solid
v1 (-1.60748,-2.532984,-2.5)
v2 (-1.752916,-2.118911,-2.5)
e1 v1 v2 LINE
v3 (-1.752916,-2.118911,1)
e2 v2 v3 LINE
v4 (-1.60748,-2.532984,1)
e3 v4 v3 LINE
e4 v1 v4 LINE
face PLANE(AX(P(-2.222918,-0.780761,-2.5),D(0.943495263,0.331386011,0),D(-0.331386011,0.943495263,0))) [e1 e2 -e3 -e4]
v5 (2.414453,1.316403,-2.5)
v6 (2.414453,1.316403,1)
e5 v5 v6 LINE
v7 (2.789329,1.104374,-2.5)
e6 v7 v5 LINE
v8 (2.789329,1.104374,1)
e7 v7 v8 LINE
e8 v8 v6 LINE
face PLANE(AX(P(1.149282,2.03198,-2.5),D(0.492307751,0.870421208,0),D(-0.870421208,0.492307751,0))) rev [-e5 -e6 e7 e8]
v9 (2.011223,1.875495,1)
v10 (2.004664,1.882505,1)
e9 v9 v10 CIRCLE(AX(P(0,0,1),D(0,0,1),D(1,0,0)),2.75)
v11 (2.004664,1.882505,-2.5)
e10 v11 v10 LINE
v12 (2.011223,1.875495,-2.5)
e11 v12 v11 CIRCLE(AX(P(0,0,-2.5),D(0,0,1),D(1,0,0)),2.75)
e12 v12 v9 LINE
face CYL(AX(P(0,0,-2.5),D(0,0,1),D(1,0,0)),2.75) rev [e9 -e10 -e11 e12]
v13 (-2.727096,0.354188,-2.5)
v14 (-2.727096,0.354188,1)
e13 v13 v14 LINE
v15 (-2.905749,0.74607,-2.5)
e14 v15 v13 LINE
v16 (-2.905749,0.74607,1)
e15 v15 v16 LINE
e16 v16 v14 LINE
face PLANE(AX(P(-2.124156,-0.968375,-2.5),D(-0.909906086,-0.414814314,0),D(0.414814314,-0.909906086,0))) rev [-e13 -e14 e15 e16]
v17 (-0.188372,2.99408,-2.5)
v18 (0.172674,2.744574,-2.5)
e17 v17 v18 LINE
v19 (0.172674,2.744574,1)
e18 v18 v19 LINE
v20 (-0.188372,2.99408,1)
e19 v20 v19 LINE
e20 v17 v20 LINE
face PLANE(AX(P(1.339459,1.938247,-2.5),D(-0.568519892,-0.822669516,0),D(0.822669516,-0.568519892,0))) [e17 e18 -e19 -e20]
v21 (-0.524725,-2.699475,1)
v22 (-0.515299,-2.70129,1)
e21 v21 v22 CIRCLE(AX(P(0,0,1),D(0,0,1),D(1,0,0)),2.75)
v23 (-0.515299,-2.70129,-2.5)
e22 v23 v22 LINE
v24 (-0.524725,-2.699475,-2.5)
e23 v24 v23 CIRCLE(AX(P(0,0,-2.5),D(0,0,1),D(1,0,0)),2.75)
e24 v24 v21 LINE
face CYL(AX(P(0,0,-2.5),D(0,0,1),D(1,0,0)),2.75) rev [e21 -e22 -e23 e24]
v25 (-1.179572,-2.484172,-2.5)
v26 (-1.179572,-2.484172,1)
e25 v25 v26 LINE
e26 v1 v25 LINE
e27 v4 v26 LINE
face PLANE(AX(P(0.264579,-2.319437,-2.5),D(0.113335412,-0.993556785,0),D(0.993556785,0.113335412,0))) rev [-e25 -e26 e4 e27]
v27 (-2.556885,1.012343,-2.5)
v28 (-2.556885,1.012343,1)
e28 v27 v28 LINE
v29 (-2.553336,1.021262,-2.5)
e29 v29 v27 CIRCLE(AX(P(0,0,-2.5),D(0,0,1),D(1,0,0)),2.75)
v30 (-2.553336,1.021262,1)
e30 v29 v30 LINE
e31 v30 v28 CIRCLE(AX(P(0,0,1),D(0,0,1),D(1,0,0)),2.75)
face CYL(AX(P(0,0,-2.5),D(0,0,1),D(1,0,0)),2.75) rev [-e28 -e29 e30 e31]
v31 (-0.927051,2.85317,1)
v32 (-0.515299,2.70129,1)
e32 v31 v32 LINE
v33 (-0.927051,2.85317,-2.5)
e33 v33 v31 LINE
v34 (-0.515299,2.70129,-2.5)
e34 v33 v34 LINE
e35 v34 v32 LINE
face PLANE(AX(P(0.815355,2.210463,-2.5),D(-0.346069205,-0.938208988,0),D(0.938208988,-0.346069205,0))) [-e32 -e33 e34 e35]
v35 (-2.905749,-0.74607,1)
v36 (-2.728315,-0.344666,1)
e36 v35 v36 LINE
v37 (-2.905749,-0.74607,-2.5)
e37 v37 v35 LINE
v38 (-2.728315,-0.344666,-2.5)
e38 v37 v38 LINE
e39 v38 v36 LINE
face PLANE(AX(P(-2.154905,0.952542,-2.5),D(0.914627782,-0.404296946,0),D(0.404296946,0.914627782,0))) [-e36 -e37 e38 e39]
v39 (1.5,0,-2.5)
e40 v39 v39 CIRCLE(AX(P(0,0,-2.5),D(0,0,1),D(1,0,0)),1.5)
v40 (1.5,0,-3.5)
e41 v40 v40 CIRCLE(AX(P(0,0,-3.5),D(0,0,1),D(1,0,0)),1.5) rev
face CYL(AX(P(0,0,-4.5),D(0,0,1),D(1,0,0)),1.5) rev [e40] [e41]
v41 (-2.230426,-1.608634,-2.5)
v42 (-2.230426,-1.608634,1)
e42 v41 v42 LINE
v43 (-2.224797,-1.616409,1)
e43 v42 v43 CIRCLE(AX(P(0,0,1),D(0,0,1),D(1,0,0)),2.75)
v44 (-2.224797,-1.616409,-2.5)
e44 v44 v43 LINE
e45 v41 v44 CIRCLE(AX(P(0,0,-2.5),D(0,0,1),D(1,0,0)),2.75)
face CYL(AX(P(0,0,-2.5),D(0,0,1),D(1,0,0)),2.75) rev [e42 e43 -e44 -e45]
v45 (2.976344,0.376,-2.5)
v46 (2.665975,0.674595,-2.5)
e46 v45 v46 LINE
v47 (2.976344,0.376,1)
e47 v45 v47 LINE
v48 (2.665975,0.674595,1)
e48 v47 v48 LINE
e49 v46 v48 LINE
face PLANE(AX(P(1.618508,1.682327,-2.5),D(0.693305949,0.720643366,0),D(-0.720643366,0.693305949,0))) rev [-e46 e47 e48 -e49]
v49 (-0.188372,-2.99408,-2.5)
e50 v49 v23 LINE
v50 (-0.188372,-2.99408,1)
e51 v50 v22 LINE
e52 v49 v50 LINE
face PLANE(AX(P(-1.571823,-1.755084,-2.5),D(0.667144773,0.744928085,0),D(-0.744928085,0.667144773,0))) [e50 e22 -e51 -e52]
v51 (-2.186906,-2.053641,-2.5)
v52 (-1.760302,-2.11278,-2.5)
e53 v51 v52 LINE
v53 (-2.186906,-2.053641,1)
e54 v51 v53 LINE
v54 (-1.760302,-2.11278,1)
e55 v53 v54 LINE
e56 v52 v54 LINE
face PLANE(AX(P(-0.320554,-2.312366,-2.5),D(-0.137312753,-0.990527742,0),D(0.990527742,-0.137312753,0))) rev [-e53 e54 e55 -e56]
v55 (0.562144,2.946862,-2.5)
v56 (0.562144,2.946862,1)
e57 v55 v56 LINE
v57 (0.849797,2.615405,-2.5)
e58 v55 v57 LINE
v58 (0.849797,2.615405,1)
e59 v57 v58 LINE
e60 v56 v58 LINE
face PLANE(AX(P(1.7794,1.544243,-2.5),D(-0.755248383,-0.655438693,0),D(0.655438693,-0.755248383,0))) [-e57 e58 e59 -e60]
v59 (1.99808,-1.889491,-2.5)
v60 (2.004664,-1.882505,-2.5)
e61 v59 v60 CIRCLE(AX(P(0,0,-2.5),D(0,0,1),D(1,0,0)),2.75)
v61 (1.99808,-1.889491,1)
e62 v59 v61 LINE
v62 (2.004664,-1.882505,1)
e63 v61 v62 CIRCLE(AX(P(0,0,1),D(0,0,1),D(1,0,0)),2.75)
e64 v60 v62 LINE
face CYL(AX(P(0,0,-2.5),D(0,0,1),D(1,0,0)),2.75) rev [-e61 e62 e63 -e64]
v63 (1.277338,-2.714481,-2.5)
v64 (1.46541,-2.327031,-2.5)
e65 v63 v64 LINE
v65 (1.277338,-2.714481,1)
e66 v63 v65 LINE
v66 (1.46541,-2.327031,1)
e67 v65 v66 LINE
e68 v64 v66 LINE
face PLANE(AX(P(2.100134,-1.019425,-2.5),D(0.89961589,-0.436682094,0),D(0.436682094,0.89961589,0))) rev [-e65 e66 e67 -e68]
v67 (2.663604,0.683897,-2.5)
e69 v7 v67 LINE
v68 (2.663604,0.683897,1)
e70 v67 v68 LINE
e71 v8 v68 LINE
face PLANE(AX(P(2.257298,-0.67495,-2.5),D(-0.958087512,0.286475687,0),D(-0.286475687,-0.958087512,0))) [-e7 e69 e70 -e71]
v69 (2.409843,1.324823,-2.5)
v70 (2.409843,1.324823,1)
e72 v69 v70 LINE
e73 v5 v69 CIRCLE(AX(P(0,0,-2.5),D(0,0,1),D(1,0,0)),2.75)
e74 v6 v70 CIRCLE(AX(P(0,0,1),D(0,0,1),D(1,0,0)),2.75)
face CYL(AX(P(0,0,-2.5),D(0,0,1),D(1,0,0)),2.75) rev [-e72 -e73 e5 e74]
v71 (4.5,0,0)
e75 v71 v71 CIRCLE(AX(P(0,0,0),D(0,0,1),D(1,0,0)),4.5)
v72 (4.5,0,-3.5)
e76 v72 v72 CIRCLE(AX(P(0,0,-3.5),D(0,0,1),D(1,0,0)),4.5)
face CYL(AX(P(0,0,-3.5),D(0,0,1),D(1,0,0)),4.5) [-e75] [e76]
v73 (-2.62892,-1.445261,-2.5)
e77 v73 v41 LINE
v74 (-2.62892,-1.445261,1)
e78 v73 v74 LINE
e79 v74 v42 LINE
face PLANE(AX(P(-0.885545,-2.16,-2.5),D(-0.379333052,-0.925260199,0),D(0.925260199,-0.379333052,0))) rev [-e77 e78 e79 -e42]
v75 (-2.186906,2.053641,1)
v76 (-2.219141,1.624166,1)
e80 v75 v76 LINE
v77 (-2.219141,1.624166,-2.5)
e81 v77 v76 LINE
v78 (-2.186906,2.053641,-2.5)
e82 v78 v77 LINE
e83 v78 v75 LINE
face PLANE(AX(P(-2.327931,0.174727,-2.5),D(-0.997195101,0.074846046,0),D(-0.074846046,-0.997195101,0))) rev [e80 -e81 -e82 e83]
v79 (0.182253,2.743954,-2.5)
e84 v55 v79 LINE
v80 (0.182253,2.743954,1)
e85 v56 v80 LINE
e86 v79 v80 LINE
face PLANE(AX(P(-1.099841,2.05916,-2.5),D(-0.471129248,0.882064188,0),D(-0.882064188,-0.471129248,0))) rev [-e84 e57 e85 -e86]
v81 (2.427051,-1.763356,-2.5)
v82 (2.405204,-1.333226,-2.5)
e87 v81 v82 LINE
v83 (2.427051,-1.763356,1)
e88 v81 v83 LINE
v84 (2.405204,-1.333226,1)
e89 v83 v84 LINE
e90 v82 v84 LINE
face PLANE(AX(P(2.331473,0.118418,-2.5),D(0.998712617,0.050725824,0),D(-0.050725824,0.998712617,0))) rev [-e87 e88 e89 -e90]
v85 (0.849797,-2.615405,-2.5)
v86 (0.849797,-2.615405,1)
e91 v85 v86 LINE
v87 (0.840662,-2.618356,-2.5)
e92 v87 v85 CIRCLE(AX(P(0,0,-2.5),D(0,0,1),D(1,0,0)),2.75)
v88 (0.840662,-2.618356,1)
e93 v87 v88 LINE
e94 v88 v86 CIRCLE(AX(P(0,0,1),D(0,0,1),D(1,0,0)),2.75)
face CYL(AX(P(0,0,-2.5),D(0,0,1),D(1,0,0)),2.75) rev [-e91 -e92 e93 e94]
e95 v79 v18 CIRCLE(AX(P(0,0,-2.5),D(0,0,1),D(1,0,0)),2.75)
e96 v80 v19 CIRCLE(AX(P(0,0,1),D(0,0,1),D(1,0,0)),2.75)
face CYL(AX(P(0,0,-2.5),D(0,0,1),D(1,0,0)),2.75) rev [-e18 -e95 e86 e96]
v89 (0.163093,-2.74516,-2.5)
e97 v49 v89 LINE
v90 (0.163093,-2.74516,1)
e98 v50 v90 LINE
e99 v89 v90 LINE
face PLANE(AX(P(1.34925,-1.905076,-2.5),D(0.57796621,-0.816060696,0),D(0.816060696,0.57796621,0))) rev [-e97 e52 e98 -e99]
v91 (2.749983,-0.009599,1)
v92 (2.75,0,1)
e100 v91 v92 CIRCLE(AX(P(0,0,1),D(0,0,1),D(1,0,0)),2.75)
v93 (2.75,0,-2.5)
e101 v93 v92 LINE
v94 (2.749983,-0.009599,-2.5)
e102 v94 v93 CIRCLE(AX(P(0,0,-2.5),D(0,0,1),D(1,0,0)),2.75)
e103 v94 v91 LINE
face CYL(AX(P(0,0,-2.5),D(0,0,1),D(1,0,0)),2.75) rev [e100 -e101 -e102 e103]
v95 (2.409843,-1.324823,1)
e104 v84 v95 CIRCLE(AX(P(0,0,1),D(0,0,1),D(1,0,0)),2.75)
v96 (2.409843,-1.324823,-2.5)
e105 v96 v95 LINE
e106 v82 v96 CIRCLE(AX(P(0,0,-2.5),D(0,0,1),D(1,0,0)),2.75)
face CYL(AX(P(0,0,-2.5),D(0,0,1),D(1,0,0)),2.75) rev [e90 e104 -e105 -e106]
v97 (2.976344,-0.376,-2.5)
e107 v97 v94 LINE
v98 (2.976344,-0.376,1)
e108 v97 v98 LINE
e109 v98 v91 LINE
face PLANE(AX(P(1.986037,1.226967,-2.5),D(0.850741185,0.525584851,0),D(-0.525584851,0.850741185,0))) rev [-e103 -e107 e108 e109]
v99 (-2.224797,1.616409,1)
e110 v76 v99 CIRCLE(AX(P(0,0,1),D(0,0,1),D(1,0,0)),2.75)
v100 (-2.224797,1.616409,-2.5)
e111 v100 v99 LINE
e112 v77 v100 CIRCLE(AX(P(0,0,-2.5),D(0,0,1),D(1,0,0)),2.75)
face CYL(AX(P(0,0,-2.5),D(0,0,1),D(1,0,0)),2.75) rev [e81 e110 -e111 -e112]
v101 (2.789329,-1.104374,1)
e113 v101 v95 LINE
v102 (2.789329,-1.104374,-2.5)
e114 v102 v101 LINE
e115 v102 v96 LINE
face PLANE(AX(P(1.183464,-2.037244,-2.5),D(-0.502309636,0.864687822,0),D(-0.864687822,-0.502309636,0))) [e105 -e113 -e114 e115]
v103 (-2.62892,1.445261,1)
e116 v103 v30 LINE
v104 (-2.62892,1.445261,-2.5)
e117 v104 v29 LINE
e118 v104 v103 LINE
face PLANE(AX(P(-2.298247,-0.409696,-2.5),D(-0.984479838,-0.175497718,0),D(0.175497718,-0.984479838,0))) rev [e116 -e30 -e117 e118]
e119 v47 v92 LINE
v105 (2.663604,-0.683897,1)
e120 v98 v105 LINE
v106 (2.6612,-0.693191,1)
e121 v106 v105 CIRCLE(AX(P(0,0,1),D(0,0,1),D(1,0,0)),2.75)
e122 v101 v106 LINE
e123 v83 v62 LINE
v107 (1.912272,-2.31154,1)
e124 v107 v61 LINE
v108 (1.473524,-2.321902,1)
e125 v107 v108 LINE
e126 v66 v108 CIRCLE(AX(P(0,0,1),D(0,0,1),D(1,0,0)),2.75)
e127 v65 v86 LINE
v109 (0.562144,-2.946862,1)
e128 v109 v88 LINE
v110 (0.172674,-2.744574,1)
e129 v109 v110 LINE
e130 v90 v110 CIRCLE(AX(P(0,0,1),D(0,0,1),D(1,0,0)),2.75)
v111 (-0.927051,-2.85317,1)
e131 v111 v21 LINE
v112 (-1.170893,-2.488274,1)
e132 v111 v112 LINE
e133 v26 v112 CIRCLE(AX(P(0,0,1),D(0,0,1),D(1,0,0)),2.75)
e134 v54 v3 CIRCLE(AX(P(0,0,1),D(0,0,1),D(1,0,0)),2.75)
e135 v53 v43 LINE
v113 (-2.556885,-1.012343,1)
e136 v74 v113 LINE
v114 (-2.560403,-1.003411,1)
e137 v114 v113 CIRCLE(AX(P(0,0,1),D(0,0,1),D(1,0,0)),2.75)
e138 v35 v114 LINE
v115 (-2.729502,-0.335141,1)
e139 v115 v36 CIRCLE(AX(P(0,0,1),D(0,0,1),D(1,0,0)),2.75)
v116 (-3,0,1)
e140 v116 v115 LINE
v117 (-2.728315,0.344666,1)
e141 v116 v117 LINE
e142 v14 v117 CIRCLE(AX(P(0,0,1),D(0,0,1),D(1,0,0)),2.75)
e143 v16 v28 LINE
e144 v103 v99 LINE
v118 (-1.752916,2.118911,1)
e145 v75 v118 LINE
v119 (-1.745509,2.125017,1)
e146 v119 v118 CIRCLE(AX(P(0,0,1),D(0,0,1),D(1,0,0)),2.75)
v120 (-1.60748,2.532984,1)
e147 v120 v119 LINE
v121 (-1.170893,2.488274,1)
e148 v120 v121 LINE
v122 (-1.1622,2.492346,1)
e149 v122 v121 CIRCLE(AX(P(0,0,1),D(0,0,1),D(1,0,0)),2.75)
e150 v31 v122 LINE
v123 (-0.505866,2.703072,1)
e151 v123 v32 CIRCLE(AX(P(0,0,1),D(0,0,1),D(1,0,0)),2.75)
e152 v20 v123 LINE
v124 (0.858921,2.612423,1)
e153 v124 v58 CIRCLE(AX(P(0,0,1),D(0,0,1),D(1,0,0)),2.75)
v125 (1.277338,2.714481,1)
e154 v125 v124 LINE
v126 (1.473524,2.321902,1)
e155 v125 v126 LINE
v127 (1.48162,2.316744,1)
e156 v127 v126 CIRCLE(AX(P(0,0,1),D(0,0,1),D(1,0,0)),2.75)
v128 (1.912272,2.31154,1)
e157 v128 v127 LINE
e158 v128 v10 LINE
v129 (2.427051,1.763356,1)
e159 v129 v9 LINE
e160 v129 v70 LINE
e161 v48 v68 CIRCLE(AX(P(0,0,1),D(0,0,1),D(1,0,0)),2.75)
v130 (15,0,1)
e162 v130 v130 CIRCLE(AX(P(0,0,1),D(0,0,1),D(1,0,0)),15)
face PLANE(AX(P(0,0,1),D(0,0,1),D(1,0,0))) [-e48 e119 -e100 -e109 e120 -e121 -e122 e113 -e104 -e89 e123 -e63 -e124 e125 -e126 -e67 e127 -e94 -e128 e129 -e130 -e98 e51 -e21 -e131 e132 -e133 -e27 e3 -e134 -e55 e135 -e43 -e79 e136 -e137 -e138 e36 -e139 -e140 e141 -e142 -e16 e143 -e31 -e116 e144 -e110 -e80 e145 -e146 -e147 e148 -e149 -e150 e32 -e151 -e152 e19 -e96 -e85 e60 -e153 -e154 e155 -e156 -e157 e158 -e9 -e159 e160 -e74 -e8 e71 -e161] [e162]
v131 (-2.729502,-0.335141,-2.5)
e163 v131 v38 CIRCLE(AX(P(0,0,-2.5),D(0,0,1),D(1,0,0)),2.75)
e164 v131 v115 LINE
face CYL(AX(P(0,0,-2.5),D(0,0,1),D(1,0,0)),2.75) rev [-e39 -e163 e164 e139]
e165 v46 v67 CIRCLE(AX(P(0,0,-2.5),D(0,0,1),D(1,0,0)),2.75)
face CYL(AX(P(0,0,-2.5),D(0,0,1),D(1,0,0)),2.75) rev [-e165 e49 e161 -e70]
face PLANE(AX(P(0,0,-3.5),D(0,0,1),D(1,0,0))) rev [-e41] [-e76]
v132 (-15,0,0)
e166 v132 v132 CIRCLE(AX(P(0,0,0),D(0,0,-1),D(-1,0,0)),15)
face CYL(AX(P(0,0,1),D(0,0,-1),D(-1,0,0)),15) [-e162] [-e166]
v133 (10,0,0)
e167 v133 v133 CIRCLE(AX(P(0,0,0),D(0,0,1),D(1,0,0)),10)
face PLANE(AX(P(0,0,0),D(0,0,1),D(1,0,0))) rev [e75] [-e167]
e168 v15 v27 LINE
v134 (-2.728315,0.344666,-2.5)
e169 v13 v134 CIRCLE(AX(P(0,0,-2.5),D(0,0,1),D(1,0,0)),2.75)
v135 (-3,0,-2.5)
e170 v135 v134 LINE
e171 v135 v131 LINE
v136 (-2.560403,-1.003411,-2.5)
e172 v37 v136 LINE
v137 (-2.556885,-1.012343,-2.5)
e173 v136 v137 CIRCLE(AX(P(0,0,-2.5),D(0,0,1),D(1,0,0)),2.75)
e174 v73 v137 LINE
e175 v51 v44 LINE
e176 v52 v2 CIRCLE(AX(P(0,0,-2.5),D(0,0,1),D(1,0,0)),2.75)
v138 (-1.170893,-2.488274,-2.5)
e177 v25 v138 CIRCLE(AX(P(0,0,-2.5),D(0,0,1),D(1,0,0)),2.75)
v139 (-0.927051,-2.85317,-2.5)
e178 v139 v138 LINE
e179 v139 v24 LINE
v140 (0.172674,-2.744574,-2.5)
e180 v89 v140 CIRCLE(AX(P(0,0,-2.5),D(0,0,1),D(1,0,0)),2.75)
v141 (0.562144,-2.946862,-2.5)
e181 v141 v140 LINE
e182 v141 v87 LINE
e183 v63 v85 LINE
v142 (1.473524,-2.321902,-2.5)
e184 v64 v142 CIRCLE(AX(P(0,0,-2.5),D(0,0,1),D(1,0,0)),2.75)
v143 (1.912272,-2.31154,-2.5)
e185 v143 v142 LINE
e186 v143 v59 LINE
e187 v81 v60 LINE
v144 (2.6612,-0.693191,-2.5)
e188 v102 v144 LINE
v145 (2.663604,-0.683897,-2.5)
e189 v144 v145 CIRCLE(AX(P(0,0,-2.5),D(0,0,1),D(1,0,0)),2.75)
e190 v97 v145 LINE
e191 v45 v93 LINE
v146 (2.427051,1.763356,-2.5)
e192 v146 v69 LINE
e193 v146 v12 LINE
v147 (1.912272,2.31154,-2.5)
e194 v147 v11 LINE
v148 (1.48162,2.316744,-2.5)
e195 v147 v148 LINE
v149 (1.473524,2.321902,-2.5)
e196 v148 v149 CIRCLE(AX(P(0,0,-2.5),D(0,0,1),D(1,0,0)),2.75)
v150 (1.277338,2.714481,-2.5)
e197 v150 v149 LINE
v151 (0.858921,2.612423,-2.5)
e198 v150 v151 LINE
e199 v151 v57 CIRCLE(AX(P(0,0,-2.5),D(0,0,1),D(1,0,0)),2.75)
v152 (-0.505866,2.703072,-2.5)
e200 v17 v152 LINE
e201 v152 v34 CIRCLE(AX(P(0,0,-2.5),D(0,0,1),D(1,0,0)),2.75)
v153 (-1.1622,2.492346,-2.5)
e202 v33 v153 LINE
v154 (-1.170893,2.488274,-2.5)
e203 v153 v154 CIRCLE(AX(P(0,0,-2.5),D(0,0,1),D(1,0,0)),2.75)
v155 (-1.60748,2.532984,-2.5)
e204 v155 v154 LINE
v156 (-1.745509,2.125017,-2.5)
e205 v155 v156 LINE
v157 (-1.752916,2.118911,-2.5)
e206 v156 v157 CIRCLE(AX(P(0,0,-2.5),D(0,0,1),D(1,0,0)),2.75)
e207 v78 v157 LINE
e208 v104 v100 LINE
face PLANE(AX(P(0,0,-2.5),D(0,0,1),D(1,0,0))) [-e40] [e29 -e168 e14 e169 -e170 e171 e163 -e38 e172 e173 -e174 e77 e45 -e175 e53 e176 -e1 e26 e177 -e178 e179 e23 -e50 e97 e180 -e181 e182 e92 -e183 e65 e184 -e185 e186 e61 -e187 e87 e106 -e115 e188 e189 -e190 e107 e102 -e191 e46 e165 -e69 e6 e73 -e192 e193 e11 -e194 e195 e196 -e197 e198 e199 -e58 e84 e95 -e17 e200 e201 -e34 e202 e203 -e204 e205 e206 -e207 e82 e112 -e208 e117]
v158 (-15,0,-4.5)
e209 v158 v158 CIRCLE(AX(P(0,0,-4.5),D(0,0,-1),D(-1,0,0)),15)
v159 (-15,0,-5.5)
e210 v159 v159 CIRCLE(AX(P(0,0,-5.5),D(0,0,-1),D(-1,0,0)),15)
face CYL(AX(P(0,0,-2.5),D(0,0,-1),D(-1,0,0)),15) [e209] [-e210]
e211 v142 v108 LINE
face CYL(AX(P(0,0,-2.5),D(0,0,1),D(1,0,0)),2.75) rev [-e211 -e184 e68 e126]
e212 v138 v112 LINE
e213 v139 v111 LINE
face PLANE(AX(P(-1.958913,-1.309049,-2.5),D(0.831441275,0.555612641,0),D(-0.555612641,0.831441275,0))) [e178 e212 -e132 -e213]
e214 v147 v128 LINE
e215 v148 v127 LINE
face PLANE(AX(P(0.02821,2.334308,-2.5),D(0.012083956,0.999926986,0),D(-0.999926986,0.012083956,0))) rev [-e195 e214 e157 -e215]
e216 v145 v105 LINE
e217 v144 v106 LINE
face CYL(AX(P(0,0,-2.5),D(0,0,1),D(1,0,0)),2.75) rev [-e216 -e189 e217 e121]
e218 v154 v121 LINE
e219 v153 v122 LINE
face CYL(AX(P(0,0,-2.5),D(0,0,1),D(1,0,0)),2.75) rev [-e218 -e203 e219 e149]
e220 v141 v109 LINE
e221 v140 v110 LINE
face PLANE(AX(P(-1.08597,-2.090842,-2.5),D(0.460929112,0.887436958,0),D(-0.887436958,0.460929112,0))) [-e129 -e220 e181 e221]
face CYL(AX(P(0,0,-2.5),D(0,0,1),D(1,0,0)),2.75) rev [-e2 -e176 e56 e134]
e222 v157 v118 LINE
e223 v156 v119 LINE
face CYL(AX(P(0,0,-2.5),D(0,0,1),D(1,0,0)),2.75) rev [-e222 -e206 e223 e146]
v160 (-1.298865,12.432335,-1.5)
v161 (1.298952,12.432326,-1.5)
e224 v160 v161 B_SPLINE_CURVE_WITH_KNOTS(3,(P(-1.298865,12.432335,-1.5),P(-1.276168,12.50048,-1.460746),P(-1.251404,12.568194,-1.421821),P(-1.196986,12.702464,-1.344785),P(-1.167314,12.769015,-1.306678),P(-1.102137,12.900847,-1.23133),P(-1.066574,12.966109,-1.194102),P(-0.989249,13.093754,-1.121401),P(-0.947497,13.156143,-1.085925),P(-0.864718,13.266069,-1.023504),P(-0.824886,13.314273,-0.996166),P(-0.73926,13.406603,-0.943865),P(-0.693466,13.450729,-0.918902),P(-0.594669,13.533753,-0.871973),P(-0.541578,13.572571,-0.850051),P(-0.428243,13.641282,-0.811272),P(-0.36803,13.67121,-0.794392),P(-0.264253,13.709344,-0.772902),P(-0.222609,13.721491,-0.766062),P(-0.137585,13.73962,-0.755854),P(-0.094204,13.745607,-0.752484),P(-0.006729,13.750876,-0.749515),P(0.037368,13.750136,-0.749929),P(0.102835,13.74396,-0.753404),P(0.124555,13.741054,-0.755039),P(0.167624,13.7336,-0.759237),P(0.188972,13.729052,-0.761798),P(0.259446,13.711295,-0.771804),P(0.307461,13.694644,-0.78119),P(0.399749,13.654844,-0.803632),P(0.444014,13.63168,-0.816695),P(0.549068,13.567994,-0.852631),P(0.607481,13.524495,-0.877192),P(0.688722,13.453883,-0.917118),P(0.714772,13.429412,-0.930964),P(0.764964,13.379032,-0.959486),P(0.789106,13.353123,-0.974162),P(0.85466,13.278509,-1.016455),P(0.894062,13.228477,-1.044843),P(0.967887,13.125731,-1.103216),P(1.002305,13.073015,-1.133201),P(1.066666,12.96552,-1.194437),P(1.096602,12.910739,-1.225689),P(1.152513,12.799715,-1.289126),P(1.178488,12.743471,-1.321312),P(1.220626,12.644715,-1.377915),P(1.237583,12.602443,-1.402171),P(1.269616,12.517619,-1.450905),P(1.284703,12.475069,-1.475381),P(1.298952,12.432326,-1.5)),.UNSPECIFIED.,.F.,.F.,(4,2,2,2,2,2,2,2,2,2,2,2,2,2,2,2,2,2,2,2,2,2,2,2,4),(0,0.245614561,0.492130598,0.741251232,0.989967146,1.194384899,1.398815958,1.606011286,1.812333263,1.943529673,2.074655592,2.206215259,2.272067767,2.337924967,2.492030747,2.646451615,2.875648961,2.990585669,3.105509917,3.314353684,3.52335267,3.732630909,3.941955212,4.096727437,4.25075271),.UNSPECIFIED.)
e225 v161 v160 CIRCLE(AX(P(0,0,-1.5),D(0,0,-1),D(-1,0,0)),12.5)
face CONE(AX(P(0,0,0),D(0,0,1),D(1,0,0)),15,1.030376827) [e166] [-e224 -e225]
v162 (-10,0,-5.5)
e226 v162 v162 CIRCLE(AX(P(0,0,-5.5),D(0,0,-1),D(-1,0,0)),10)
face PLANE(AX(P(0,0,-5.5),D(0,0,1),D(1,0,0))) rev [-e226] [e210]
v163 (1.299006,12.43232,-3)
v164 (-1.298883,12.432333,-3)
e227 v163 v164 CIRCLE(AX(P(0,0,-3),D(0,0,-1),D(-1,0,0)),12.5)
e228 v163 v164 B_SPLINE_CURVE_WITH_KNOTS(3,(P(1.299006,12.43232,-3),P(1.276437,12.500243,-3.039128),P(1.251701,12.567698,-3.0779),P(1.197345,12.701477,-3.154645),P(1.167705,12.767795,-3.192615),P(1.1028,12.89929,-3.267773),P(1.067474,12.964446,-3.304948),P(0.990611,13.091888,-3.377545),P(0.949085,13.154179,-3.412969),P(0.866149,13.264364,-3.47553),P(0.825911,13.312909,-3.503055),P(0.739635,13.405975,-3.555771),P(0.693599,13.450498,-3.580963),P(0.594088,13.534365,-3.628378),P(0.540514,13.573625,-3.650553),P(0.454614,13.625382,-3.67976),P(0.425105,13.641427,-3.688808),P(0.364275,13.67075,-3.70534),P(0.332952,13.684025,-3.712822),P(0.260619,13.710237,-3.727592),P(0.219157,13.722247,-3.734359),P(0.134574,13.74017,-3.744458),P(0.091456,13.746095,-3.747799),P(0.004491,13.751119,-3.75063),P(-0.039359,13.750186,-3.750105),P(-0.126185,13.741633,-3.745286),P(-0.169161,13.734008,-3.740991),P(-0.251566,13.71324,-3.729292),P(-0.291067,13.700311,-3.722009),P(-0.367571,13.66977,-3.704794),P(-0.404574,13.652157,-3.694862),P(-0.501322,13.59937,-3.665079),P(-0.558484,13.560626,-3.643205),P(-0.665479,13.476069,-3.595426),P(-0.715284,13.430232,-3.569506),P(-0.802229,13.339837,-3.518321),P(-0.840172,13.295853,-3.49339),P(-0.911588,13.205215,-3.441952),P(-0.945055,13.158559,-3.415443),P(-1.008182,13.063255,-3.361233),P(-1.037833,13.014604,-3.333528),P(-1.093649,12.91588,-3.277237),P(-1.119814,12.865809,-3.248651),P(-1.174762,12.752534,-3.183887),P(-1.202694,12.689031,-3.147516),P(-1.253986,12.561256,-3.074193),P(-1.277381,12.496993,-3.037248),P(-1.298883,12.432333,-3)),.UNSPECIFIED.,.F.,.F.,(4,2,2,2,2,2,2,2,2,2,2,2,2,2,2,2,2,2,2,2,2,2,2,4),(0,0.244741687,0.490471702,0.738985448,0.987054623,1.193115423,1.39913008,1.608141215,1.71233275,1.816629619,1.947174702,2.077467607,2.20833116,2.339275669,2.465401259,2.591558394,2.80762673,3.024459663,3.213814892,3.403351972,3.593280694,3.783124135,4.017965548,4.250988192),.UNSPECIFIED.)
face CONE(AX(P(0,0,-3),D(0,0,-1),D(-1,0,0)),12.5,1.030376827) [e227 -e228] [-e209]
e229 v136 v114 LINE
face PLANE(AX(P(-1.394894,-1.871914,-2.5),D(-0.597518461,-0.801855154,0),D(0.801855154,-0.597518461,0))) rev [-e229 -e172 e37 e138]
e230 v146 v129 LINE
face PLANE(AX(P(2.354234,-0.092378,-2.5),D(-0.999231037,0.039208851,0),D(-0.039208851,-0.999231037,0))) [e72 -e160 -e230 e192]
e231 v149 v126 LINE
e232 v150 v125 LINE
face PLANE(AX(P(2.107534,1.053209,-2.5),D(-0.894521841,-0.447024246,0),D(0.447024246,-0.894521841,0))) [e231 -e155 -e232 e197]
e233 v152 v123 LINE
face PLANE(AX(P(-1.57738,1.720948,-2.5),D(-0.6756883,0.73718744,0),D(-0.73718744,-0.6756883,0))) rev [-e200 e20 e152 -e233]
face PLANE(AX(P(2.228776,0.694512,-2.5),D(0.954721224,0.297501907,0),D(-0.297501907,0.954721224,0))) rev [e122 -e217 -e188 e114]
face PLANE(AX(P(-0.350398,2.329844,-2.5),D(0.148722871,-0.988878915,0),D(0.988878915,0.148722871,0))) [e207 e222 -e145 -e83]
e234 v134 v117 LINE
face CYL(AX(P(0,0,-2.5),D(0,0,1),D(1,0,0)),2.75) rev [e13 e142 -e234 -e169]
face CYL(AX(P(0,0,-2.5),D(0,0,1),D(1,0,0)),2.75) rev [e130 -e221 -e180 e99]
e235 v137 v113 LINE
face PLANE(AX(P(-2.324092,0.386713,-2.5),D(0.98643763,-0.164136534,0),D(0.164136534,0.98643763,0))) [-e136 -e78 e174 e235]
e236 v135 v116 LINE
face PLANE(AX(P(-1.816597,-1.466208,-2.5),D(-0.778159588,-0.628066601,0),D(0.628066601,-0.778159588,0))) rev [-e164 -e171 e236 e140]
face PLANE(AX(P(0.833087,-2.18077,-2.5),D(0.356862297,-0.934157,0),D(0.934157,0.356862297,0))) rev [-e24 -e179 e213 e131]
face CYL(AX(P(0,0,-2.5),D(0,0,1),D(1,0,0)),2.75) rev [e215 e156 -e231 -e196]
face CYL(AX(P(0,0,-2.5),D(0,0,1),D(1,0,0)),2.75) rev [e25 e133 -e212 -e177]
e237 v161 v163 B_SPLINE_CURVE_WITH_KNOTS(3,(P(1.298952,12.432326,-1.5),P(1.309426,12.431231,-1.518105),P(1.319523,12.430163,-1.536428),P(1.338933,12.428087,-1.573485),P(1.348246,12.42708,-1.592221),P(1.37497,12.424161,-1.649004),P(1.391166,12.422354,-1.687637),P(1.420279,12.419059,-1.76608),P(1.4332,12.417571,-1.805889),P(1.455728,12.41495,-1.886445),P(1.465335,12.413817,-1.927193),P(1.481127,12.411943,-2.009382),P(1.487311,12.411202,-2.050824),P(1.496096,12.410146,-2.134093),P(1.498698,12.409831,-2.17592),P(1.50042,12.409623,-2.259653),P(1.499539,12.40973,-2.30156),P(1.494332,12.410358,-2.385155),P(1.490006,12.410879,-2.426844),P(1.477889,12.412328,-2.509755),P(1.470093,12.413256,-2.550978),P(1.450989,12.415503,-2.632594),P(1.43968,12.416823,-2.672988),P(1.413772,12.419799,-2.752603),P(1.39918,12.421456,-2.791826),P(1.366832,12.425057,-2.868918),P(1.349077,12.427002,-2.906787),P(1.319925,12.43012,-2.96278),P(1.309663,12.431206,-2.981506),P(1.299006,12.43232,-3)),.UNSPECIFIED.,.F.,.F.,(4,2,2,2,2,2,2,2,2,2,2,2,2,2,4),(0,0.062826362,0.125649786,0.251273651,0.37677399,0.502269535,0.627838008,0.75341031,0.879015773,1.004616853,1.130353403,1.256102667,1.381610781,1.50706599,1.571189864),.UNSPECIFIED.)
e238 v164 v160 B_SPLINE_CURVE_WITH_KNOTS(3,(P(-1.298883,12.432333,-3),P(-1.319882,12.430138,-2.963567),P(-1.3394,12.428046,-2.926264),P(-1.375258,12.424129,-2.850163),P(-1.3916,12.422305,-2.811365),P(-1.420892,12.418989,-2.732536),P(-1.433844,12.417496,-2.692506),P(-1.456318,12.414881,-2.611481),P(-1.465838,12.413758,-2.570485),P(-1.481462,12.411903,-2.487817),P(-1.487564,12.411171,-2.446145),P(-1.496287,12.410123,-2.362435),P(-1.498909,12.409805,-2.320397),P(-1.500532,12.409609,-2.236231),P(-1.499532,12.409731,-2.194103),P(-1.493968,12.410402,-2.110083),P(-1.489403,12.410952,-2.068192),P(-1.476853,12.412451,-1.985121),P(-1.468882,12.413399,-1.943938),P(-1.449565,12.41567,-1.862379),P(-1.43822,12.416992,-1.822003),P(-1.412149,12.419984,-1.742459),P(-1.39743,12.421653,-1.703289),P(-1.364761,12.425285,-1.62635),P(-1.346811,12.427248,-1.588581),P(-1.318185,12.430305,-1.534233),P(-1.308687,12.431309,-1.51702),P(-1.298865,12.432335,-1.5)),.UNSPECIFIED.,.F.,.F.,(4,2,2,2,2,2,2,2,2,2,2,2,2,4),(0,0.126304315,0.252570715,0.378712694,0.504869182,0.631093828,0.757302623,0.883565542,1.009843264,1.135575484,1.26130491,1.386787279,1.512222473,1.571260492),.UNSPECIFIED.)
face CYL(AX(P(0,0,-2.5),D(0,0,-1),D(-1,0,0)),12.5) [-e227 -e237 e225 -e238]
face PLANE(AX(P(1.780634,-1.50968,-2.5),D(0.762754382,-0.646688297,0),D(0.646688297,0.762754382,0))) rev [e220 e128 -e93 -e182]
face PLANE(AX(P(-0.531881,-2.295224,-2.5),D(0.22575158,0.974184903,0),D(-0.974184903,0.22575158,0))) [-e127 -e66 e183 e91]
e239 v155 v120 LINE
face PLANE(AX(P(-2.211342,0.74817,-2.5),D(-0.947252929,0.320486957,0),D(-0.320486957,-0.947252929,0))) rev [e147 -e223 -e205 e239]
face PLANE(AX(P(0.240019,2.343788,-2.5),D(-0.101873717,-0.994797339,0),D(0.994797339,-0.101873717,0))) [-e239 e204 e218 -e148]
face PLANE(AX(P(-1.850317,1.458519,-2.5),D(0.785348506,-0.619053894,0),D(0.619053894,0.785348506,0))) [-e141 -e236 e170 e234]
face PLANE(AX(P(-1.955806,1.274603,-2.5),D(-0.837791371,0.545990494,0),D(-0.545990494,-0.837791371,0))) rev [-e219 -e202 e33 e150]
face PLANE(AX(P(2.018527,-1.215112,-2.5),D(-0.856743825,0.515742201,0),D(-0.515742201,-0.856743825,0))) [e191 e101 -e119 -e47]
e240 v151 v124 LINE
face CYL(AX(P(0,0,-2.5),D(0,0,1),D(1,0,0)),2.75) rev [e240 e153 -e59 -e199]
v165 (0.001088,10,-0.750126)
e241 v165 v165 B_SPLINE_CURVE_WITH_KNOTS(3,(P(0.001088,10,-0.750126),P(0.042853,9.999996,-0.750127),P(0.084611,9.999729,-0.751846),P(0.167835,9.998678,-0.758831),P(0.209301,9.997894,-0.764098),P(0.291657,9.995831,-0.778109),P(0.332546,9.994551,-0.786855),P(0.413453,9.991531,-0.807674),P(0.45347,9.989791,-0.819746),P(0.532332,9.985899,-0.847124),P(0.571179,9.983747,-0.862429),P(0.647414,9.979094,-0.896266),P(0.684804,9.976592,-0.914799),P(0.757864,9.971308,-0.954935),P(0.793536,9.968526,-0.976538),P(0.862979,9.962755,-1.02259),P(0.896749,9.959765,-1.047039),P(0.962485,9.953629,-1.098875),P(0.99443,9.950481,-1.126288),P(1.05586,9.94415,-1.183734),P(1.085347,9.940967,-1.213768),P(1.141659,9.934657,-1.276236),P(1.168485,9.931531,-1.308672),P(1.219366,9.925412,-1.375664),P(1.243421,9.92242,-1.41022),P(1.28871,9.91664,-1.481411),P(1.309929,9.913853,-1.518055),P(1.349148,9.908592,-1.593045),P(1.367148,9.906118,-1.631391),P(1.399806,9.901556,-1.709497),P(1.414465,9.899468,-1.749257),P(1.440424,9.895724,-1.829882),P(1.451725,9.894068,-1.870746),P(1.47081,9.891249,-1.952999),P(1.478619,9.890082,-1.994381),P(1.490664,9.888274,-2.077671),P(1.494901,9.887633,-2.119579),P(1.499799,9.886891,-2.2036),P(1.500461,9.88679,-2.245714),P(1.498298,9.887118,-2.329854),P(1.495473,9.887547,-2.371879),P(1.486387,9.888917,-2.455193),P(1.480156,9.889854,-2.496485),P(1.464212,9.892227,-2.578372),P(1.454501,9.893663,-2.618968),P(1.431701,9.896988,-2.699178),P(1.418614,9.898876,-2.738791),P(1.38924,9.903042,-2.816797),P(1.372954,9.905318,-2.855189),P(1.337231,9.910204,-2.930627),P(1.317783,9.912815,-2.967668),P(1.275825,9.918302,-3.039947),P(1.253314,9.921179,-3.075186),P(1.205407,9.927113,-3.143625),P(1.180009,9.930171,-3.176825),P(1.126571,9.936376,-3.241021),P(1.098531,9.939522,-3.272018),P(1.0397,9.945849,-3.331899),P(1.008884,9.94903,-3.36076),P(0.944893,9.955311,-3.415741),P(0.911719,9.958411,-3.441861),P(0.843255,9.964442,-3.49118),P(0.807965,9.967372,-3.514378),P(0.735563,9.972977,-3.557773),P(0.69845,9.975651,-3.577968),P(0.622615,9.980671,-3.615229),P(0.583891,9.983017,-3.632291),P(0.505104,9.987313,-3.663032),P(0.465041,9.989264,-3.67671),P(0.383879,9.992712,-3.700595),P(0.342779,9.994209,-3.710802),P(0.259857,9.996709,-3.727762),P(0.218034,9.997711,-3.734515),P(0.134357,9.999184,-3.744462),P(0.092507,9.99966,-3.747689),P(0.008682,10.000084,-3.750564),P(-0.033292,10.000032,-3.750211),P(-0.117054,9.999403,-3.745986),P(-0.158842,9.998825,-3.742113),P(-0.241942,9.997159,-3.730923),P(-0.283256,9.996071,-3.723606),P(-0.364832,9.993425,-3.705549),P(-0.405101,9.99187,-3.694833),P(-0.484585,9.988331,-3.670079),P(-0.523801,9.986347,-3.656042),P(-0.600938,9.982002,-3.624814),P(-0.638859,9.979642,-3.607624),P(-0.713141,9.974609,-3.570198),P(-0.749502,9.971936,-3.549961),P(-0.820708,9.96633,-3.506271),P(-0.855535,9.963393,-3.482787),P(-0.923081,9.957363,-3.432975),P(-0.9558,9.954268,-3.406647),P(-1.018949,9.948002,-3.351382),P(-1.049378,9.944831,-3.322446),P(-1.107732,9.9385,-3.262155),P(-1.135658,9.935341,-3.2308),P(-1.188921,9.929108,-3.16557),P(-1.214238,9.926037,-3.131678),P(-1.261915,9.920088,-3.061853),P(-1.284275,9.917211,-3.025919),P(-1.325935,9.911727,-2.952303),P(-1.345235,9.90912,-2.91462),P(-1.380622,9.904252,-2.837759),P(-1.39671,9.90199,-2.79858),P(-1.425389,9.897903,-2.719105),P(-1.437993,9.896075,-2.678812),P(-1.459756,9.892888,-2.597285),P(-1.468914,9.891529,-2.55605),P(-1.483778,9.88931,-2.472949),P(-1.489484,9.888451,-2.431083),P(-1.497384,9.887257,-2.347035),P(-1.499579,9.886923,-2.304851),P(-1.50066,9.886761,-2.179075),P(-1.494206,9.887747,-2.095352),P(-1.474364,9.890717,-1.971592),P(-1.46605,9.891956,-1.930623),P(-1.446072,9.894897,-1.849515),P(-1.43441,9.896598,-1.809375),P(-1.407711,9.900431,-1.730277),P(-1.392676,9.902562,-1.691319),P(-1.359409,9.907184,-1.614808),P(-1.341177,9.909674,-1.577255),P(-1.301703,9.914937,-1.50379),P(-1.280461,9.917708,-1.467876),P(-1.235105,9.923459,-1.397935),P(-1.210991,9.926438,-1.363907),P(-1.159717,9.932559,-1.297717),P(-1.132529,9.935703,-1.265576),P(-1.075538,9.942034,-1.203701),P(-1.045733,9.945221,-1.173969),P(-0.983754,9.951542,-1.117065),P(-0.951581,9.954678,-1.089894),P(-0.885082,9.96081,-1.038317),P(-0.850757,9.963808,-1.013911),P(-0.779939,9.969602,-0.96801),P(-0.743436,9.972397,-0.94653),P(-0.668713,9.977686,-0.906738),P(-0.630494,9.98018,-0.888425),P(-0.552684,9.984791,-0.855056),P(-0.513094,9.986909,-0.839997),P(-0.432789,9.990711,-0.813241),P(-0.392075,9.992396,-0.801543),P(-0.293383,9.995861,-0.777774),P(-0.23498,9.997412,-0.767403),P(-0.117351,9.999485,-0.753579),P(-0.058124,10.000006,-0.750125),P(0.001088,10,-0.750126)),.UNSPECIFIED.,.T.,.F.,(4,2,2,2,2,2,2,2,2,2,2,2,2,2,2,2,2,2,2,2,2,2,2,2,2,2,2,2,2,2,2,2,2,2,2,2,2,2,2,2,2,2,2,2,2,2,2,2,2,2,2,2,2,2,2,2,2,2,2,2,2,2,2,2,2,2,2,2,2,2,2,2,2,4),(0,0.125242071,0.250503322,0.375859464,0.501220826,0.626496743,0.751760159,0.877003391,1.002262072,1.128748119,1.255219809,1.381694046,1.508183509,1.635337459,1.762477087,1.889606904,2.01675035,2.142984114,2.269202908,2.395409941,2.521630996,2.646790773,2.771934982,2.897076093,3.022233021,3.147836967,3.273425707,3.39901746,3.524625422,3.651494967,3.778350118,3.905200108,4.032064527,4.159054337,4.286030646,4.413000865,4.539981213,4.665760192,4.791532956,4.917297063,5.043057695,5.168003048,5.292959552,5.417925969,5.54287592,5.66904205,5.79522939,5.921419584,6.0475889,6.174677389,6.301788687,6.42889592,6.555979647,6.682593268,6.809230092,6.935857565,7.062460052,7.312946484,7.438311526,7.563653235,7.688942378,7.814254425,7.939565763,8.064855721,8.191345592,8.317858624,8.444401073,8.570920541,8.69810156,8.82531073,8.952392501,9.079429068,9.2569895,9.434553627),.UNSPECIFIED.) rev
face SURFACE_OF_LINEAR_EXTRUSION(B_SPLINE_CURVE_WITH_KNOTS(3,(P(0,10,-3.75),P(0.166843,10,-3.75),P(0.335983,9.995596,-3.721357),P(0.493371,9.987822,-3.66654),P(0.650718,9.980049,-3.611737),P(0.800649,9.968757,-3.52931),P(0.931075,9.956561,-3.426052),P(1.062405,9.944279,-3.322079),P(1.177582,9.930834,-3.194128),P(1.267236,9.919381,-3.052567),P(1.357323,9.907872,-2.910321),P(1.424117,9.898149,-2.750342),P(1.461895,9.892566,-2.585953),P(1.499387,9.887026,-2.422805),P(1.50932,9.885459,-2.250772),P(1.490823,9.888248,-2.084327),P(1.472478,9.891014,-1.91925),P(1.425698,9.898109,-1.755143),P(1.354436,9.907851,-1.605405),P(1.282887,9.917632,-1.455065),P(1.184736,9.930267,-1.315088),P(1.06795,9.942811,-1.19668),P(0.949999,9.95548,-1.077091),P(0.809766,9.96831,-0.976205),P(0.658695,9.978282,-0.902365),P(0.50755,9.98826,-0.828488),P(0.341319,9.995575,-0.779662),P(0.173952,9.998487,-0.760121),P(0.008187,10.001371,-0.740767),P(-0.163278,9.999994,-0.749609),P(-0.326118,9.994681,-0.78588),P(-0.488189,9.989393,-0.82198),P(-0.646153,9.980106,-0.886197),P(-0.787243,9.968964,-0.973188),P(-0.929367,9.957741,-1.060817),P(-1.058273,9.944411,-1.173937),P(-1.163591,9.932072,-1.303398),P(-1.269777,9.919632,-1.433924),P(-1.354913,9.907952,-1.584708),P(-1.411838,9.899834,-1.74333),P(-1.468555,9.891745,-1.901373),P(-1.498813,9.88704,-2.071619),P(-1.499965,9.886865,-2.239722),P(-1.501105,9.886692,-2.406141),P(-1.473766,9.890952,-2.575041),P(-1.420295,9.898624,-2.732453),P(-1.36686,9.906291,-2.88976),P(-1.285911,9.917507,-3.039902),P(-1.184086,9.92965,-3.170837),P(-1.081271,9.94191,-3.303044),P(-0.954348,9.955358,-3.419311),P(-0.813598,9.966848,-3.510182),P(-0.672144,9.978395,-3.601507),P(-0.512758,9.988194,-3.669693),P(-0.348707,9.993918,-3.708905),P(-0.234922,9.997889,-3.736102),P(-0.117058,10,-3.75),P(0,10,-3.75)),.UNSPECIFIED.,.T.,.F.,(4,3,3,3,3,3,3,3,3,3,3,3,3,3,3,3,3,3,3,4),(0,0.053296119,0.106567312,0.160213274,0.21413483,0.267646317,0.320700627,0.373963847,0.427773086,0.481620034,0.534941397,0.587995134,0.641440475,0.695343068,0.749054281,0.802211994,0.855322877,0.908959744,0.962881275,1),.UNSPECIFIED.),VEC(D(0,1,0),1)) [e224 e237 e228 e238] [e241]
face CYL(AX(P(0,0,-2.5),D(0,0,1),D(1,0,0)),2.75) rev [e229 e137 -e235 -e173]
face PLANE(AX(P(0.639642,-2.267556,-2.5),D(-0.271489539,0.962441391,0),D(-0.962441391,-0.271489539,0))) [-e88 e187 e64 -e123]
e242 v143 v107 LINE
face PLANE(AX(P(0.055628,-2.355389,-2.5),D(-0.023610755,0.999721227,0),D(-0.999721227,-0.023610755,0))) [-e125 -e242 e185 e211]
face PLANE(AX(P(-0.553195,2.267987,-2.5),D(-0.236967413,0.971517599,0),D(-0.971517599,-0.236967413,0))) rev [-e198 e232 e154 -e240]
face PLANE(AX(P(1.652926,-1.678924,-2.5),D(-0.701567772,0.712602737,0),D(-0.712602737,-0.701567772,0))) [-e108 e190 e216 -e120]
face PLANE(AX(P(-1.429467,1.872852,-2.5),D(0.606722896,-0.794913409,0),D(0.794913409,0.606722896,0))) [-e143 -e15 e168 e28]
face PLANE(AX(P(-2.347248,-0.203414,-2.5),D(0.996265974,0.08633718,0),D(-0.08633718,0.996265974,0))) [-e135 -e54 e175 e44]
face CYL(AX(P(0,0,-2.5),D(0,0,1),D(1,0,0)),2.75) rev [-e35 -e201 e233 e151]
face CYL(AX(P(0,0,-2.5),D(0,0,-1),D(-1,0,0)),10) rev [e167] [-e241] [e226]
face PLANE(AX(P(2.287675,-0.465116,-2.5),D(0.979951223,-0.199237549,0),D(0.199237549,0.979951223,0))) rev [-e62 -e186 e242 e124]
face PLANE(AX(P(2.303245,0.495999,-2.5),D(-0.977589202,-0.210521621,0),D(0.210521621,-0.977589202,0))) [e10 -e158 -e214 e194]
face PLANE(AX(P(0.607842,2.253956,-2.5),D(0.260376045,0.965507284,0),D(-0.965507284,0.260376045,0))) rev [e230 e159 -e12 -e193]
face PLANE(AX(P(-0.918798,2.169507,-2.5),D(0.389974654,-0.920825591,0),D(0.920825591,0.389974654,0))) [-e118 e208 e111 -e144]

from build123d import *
from OCP.BRepAlgoAPI import BRepAlgoAPI_Cut
from OCP.TopTools import TopTools_ListOfShape

# Parameters (mm, degrees)
SKETCH1_R           = 15
SKETCH1_R_2         = 4.5
BOSS_EXTRUDE1_DEPTH = 1
BOSS_EXTRUDE2_START = -3.5
SKETCH1_2_R         = 4.5
BOSS_EXTRUDE2_DEPTH = 4.5
SKETCH2_R           = 1.5
CUT_EXTRUDE1_DEPTH  = 4.5
CUT_EXTRUDE2_START  = -4.5
SKETCH3_R           = 2.75
CUT_EXTRUDE2_DEPTH  = 3.5
CUT_EXTRUDE3_START  = -4.5
CUT_EXTRUDE3_DEPTH  = 3.5
CIRPATTERN1_COUNT   = 25
CUT_EXTRUDE4_START  = 9.886861
SKETCH6_R           = 1.5
CUT_EXTRUDE4_DEPTH  = 3.863123


with BuildPart() as part:
    # Sketch1 → Boss-Extrude1 (new body)
    with BuildSketch(Plane.XY):
        Circle(SKETCH1_R)
        Circle(SKETCH1_R_2, mode=Mode.SUBTRACT)
    extrude(amount=BOSS_EXTRUDE1_DEPTH)

    # Sketch1<2> → Boss-Extrude2 (add)
    with BuildSketch(Plane.XY.offset(BOSS_EXTRUDE2_START)):
        Circle(SKETCH1_2_R)
    extrude(amount=BOSS_EXTRUDE2_DEPTH)

    # Sketch2 → Cut-Extrude1 (cut)
    with BuildSketch(Plane(origin=(0, 0, 0), x_dir=(-1, 0, 0), z_dir=(0, 0, -1))):
        with Locations(Location((0, 0, 0), (0, 0, 180))):
            Circle(SKETCH2_R)
    extrude(amount=CUT_EXTRUDE1_DEPTH, mode=Mode.SUBTRACT)

    # Sketch3 → Cut-Extrude2 (cut)
    with BuildSketch(Plane(origin=(0, 0, -3.5), x_dir=(-1, 0, 0), z_dir=(0, 0, -1)).offset(CUT_EXTRUDE2_START)):
        with Locations(Location((0, 0, 0), (0, 0, 180))):
            Circle(SKETCH3_R)
    extrude(amount=CUT_EXTRUDE2_DEPTH, mode=Mode.SUBTRACT)

    # Sketch4 → Cut-Extrude3 (cut)
    with BuildSketch(Plane(origin=(0, 0, -3.5), x_dir=(-1, 0, 0), z_dir=(0, 0, -1)).offset(CUT_EXTRUDE3_START)):
        with BuildLine():
            Line((-2.665974712, 0.674595311), (-2.976344104, 0.375999701))
            Line((-2.976344104, 0.375999701), (-2.728315429, 0.344666392))
            ThreePointArc((-2.728315429, 0.344666392), (-2.70218519, 0.510583192), (-2.665974712, 0.674595311))
        make_face()
        with BuildLine():
            Line((-2.976344104, 0.375999701), (-2.75, 0))
            ThreePointArc((-2.75, 0), (-2.744573503, 0.172673929), (-2.728315429, 0.344666392))
            Line((-2.728315429, 0.344666392), (-2.976344104, 0.375999701))
        make_face()
    cut_extrude3 = extrude(amount=CUT_EXTRUDE3_DEPTH, mode=Mode.SUBTRACT)

    # CirPattern1: Cut-Extrude3 ×25 about axis
    cirpattern1_axis = Axis((0, 0, 0), (0, 0, 1))
    for i in range(1, CIRPATTERN1_COUNT):
        add(cut_extrude3.rotate(cirpattern1_axis, i * 360 / CIRPATTERN1_COUNT), mode=Mode.SUBTRACT)

    # Sketch5 → Revolve1 (revolve)
    with BuildSketch(Plane(origin=(0, 0, 0), x_dir=(1, 0, 0), z_dir=(0, 1, 0))):
        Polygon((-15, 0), (-12.5, 1.5), (-12.5, 3), (-15, 4.5), (-15, 5.5), (-10, 5.5), (-10, 0), align=None)
    revolve(axis=Axis((0, 0, -2.5), (0, 0, 1)))


with BuildPart() as cut_extrude4_tool:
    # Sketch6 → Cut-Extrude4 (new body)
    with BuildSketch(Plane(origin=(0, 0, 0), x_dir=(1, 0, 0), z_dir=(0, 1, 0)).offset(CUT_EXTRUDE4_START)):
        with Locations((0, 2.25)):
            Circle(SKETCH6_R)
    extrude(amount=CUT_EXTRUDE4_DEPTH)


with BuildPart() as part_1:
    add(part.part)

    # Cut-Extrude4: cut by cut_extrude4_tool, with a tolerance
    cut_extrude4_stock = TopTools_ListOfShape()
    cut_extrude4_stock.Append(part_1.part.wrapped)
    cut_extrude4_tools = TopTools_ListOfShape()
    cut_extrude4_tools.Append(cut_extrude4_tool.part.wrapped)
    cut_extrude4_cut = BRepAlgoAPI_Cut()
    cut_extrude4_cut.SetArguments(cut_extrude4_stock)
    cut_extrude4_cut.SetTools(cut_extrude4_tools)
    cut_extrude4_cut.SetFuzzyValue(0.00001)
    cut_extrude4_cut.Build()
    add(Compound.cast(cut_extrude4_cut.Shape()).solids(), mode=Mode.REPLACE)


solid = part_1.part
